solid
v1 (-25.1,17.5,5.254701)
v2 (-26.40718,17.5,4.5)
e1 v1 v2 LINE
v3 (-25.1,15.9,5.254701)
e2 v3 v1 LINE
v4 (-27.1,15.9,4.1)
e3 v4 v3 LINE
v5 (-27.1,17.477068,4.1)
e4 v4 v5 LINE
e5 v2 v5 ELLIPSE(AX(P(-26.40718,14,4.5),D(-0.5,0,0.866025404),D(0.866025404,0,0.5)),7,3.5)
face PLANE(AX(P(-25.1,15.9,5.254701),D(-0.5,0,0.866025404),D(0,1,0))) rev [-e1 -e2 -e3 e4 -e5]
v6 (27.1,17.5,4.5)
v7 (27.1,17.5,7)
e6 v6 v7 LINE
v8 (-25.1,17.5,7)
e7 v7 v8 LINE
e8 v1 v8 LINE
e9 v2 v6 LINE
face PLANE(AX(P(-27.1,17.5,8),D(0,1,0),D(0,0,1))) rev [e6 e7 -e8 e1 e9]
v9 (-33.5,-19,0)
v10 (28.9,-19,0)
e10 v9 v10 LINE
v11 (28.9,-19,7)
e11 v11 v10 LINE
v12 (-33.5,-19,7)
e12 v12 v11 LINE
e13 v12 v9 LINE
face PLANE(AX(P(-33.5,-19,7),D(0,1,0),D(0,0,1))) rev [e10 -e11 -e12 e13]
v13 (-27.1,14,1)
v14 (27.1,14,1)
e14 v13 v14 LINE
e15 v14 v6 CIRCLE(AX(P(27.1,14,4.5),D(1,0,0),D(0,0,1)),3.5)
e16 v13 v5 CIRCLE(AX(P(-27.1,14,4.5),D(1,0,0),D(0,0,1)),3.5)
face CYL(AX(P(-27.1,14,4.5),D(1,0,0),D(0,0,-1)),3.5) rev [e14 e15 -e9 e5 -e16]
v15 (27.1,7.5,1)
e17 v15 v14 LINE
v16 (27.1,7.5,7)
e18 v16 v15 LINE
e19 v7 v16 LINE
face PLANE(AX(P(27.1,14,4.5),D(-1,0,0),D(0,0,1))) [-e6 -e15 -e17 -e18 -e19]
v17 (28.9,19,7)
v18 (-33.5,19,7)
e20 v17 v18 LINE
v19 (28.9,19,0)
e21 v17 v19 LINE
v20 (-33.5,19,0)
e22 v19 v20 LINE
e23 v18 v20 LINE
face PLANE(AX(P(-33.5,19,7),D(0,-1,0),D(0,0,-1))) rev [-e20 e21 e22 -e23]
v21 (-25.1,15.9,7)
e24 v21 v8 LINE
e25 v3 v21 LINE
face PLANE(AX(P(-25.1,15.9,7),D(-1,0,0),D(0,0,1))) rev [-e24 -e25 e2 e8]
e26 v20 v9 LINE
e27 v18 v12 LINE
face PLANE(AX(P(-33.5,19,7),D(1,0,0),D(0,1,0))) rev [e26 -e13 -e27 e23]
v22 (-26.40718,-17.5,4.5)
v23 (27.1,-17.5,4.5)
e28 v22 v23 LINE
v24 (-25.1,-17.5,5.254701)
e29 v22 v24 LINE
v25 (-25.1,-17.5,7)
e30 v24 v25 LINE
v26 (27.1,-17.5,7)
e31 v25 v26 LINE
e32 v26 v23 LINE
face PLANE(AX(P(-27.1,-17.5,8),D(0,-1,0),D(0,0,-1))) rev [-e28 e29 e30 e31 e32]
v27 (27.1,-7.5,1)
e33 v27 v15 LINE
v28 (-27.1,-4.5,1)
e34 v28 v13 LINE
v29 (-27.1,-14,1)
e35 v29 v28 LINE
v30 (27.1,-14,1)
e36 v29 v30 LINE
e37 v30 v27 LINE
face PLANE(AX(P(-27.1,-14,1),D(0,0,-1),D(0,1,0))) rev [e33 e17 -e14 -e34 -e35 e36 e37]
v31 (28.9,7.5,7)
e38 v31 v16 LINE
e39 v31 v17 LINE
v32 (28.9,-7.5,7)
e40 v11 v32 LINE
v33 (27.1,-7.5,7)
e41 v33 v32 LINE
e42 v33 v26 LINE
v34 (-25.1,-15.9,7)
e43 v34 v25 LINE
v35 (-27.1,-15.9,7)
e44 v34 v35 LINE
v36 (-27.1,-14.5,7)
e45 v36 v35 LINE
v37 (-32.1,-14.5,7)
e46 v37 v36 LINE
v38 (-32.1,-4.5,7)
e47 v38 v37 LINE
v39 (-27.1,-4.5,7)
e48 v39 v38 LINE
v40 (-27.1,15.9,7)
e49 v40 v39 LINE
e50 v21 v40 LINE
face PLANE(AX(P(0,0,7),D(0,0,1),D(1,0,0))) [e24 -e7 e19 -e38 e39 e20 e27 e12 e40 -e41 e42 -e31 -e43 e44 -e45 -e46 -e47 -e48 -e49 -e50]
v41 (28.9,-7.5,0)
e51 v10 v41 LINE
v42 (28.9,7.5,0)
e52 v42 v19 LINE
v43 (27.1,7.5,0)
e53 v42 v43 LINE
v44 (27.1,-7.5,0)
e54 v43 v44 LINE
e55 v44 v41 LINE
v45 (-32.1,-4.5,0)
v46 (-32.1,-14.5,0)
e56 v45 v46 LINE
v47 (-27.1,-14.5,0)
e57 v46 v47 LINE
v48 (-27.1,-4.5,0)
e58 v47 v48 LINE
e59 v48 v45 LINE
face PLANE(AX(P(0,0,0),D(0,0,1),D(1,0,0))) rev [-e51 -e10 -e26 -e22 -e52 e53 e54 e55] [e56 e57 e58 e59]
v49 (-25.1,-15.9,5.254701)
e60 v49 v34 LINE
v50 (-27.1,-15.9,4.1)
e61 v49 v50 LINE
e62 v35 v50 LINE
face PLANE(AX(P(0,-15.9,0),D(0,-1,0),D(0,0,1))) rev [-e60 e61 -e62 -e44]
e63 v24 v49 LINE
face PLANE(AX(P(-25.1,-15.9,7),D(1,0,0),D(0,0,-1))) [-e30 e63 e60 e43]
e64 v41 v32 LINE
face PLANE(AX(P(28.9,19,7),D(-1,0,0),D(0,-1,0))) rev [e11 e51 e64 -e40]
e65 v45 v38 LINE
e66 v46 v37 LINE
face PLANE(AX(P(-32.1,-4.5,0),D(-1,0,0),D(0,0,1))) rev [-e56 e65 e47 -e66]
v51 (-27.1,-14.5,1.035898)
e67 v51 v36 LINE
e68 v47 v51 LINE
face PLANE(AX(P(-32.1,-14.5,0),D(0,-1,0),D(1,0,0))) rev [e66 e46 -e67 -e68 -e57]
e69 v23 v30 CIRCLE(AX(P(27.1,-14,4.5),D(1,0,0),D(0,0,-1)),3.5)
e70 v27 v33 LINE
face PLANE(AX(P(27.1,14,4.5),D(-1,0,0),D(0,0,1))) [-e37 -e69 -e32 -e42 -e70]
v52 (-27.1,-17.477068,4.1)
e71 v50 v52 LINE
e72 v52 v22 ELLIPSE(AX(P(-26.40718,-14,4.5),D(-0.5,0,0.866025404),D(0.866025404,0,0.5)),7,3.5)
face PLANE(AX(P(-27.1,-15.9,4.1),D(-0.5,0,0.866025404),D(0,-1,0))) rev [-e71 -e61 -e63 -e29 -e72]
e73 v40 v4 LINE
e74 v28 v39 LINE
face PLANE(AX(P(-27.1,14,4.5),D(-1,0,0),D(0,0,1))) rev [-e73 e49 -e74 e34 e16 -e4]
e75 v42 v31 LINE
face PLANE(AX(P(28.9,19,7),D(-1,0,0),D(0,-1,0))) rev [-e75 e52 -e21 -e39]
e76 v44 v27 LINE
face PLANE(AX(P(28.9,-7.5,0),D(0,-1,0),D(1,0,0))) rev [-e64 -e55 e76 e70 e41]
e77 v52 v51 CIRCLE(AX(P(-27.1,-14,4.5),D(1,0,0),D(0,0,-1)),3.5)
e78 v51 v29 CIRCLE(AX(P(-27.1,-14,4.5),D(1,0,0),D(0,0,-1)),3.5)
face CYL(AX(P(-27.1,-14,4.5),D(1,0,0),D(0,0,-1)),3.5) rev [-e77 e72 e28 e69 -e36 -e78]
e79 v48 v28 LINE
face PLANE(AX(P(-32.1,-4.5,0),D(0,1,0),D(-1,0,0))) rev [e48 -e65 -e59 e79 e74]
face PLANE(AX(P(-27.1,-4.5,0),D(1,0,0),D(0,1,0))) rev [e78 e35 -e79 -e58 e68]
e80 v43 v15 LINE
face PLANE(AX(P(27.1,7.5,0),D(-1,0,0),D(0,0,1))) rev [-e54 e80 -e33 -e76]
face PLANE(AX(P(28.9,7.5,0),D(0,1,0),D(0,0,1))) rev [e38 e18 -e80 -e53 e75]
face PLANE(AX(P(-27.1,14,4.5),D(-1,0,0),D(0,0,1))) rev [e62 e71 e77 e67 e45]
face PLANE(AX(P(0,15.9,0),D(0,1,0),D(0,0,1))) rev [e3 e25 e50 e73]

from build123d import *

# Parameters (mm, degrees)
SKETCH2_W                 = 62.4
SKETCH2_H                 = 38
BOSS_EXTRUDE1_DEPTH       = 7
CUT_EXTRUDE1_DEPTH        = 27.1
SKETCH4_W                 = 1.8
SKETCH4_H                 = 15
FORFINGER_DEPTH           = 40.143965052
SKETCH5_W                 = 2
SKETCH5_H                 = 2.9
BOSS_EXTRUDE2_DEPTH       = 1.6
CHAMFER1_SIZE2            = 1.154700538
CHAMFER1_SIZE             = 2
CHAMFER1_OF_MIRROR1_SIZE2 = 1.154700538
CHAMFER1_OF_MIRROR1_SIZE  = 2
SKETCH6_W                 = 5
SKETCH6_H                 = 10
CUT_EXTRUDE3_DEPTH        = 40.143965052


with BuildPart() as part:
    # Sketch2 → Boss-Extrude1 (new body)
    with BuildSketch(Plane.XY):
        with Locations((-2.3, 0)):
            Rectangle(SKETCH2_W, SKETCH2_H)
    extrude(amount=BOSS_EXTRUDE1_DEPTH)

    # Sketch3 → Cut-Extrude1 (cut, symmetric)
    with BuildSketch(Plane(origin=(0, 0, 0), x_dir=(0, 0, -1), z_dir=(1, 0, 0))):
        with BuildLine():
            Line((-8, 17.5), (-4.5, 17.5))
            ThreePointArc((-4.5, 17.5), (-2.025126266, 16.474873734), (-1, 14))
            Line((-1, 14), (-1, -14))
            ThreePointArc((-1, -14), (-2.025126266, -16.474873734), (-4.5, -17.5))
            Line((-4.5, -17.5), (-8, -17.5))
            Line((-8, -17.5), (-8, 17.5))
        make_face()
    extrude(amount=CUT_EXTRUDE1_DEPTH, both=True, mode=Mode.SUBTRACT)

    # Sketch4 → ForFinger (cut, through all)
    with BuildSketch(Plane.XY.offset(7)):
        with Locations((28, 0)):
            Rectangle(SKETCH4_W, SKETCH4_H)
    extrude(amount=-FORFINGER_DEPTH, mode=Mode.SUBTRACT)

    # Sketch5 → Boss-Extrude2 (add)
    with BuildSketch(Plane.XZ.offset(-17.5)):
        with Locations((-26.1, 5.55)):
            Rectangle(SKETCH5_W, SKETCH5_H)
    boss_extrude2 = extrude(amount=BOSS_EXTRUDE2_DEPTH)

    # Chamfer1
    chamfer1_edges = [part.edges().sort_by_distance(p)[0] for p in [
        (-25.1, 16.688533865, 4.1),
    ]]
    chamfer1_side = [part.faces().sort_by_distance(p)[0] for p in [
        (-25.123094011, 16.688533865, 4.1),
    ]]
    chamfer(chamfer1_edges, length=CHAMFER1_SIZE - 0.0001, length2=CHAMFER1_SIZE2 - 0.0001, reference=chamfer1_side[0])  # a hair under: the kernel refuses the full size

    # Mirror1: Boss-Extrude2 across plane
    add(boss_extrude2.mirror(Plane.ZX))

    # Chamfer1 of Mirror1
    chamfer1_of_mirror1_edges = [part.edges().sort_by_distance(p)[0] for p in [
        (-25.1, -16.688533865, 4.1),
    ]]
    chamfer1_of_mirror1_side = [part.faces().sort_by_distance(p)[0] for p in [
        (-25.123094011, -16.688533865, 4.1),
    ]]
    chamfer(chamfer1_of_mirror1_edges, length=CHAMFER1_OF_MIRROR1_SIZE - 0.0001, length2=CHAMFER1_OF_MIRROR1_SIZE2 - 0.0001, reference=chamfer1_of_mirror1_side[0])  # a hair under: the kernel refuses the full size

    # Sketch6 → Cut-Extrude3 (cut, through all)
    with BuildSketch(Plane.XY.offset(7)):
        with Locations((-29.6, -9.5)):
            Rectangle(SKETCH6_W, SKETCH6_H)
    extrude(amount=-CUT_EXTRUDE3_DEPTH, mode=Mode.SUBTRACT)


solid = part.part
